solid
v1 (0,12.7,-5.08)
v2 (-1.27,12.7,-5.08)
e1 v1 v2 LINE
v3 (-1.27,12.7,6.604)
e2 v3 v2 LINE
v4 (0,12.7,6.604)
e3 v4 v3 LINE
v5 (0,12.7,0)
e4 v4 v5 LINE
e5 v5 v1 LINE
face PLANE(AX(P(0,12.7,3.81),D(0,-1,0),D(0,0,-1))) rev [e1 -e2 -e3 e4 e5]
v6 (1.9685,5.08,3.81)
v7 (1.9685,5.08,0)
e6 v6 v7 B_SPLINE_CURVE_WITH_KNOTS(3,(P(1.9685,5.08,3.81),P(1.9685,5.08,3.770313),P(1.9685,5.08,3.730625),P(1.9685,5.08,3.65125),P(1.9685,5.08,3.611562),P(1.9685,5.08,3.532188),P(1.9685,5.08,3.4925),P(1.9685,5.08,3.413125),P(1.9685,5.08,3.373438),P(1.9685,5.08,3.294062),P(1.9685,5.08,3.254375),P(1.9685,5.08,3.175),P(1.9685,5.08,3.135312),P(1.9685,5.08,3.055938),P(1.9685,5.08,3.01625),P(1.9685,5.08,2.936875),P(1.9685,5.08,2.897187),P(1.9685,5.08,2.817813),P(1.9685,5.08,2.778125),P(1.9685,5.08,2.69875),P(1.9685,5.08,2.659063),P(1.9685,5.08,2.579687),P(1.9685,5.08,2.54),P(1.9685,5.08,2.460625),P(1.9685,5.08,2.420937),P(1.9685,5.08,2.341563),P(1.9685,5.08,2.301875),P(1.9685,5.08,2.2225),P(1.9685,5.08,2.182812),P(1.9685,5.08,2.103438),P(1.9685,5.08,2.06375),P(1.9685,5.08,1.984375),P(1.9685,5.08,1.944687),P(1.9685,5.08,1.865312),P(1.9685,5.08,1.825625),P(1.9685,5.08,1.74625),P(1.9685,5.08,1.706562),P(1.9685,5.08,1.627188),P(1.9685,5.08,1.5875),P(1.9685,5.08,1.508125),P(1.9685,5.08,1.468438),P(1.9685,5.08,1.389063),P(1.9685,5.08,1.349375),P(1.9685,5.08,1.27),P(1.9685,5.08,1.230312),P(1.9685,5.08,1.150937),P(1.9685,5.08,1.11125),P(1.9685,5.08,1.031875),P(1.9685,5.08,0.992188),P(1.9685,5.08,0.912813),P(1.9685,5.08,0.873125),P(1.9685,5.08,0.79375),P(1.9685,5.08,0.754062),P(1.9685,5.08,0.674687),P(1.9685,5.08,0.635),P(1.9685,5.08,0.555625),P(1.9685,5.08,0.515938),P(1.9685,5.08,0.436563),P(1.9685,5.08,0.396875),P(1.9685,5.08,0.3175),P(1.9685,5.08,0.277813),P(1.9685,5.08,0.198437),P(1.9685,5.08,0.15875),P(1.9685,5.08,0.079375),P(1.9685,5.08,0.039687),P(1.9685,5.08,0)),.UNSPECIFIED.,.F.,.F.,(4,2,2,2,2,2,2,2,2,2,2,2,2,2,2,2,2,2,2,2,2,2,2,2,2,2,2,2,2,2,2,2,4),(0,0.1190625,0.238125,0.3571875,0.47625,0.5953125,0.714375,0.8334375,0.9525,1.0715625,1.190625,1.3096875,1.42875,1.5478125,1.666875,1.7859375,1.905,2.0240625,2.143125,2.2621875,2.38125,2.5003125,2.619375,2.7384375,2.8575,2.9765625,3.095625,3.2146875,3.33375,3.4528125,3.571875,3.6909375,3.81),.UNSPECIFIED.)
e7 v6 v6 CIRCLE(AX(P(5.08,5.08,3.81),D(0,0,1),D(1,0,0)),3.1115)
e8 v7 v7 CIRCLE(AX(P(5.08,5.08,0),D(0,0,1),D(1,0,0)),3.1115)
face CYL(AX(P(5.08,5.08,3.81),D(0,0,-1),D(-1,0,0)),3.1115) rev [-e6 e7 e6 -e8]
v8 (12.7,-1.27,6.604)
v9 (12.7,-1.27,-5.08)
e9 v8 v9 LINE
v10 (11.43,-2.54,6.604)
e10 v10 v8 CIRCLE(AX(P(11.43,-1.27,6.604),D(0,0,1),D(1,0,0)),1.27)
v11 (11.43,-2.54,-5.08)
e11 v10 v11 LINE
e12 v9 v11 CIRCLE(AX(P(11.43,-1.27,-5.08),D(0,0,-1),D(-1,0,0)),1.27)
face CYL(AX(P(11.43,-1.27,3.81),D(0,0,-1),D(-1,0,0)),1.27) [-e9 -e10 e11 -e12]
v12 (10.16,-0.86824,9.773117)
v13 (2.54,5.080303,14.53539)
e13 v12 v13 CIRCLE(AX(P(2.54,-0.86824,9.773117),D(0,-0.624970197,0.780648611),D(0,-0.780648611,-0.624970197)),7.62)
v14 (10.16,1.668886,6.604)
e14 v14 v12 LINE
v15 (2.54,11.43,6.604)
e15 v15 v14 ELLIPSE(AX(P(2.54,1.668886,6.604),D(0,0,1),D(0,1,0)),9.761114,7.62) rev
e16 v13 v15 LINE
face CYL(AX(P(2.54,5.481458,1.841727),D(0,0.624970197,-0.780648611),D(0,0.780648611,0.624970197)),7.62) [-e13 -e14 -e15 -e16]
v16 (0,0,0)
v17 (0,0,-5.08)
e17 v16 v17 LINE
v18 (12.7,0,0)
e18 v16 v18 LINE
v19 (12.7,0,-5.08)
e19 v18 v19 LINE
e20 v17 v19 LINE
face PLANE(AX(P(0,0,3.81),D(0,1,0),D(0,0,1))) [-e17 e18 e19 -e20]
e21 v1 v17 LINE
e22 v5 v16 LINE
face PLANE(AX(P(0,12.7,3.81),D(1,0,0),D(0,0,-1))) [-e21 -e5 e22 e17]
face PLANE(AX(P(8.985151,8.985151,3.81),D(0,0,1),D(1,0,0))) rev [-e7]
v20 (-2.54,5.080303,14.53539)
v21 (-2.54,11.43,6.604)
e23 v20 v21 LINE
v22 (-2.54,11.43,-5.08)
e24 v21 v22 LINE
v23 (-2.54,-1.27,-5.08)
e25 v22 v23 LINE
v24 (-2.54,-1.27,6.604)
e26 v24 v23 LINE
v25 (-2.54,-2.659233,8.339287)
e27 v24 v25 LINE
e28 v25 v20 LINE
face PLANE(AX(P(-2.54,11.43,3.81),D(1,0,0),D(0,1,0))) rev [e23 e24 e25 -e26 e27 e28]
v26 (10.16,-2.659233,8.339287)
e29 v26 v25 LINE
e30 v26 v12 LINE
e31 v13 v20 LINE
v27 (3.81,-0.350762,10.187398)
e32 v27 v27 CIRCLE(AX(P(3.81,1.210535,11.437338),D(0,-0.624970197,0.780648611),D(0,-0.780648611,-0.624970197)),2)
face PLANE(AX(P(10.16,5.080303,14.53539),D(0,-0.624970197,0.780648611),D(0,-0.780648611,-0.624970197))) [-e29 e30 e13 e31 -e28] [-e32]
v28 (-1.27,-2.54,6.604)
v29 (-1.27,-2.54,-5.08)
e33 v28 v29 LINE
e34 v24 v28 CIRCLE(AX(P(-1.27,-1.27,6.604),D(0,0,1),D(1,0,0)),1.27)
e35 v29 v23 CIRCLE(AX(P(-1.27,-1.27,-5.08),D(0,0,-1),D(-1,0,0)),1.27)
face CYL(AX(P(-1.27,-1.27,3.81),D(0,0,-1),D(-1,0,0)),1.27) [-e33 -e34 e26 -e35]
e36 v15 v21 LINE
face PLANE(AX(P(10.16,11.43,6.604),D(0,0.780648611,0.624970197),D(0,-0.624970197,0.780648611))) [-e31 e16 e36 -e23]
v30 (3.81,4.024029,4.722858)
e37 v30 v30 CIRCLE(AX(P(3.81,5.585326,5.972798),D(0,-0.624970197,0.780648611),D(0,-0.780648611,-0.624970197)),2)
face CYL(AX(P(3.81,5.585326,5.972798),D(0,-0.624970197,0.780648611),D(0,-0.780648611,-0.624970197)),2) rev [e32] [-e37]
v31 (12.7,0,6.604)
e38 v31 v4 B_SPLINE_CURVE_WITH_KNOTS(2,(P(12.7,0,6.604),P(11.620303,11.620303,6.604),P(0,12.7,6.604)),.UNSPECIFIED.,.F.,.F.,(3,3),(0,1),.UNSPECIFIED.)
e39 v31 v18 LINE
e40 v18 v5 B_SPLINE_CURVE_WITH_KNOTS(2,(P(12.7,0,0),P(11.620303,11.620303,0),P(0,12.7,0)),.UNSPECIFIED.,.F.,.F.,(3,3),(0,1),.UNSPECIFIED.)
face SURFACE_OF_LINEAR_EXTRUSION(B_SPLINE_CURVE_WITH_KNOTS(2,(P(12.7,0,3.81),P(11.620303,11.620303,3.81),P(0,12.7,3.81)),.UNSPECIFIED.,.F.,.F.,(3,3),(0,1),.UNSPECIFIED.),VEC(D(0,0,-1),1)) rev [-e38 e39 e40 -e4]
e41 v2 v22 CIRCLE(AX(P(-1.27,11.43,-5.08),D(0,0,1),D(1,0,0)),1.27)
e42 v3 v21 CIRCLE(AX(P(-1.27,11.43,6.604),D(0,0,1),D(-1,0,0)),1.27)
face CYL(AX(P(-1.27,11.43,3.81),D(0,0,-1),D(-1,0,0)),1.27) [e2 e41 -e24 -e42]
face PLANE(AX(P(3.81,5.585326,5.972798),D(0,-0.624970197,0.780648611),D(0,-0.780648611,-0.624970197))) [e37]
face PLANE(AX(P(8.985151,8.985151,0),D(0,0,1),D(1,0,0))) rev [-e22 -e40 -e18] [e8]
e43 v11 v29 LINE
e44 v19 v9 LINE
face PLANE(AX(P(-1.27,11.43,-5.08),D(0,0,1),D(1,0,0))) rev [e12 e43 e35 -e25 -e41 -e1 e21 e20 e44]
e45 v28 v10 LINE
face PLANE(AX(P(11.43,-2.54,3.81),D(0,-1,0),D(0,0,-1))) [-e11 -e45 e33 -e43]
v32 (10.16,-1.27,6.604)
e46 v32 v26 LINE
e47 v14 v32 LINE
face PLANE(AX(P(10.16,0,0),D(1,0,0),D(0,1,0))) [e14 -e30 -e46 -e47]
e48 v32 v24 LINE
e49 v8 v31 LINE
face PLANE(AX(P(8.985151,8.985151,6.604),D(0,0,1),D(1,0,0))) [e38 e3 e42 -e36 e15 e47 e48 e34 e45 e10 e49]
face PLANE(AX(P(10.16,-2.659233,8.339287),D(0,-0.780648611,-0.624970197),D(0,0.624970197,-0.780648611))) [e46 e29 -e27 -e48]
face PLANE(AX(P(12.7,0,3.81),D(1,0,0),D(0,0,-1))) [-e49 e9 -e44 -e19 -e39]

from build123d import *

# Parameters (mm, degrees)
SKETCH1_R                = 3.1115
BOSS_EXTRUDE1_DEPTH      = 3.81
BOSS_EXTRUDE2_DEPTH      = 5.08
BOSS_EXTRUDE2_DEPTH_BACK = 3.81
BOSS_EXTRUDE3_START      = 0.254
BOSS_EXTRUDE3_DEPTH      = 0.254
BOSS_EXTRUDE4_START      = 2.54
BOSS_EXTRUDE4_DEPTH      = 2.54
BOSS_EXTRUDE5_DEPTH      = 12.7
FILLET1_R                = 7.62
SKETCH11_R               = 2.000000064
CUT_EXTRUDE1_DEPTH       = 6.99999997


with BuildPart() as part:
    # Sketch1 → Boss-Extrude1 (new body)
    with BuildSketch(Plane.XY):
        with BuildLine():
            Line((0, 0), (12.7, 0))
            add(Edge.make_bspline(
                [(0, 12.7), (11.620302725, 11.620302725), (12.7, 0)],
                knots=[0, 0, 0, 1, 1, 1], degree=2))
            Line((0, 12.7), (0, 0))
        make_face()
        with Locations(Location((5.08, 5.08, 0), (0, 0, 180))):
            Circle(SKETCH1_R, mode=Mode.SUBTRACT)
    extrude(amount=BOSS_EXTRUDE1_DEPTH)

    # Sketch2 → Boss-Extrude2 (add, two sides: drawn at the far end of the back side and taken through both)
    with BuildSketch(Plane(origin=(0, 0, 0), x_dir=(-1, 0, 0), z_dir=(0, 0, -1)).offset(-BOSS_EXTRUDE2_DEPTH_BACK)):
        with BuildLine():
            Line((0, 12.7), (1.27, 12.7))
            ThreePointArc((1.27, 12.7), (2.168025612, 12.328025612), (2.54, 11.43))
            Line((2.54, 11.43), (2.54, -1.27))
            ThreePointArc((2.54, -1.27), (2.168025612, -2.168025612), (1.27, -2.54))
            Line((1.27, -2.54), (-11.43, -2.54))
            ThreePointArc((-11.43, -2.54), (-12.328025612, -2.168025612), (-12.7, -1.27))
            Line((-12.7, -1.27), (-12.7, 0))
            Line((-12.7, 0), (0, 0))
            Line((0, 0), (0, 12.7))
        make_face()
    extrude(amount=BOSS_EXTRUDE2_DEPTH + BOSS_EXTRUDE2_DEPTH_BACK)

    # Sketch3 → Boss-Extrude3 (add)
    with BuildSketch(Plane.XY.offset(3.81).offset(BOSS_EXTRUDE3_START)):
        with BuildLine():
            Line((-2.54, 11.43), (-2.54, -1.27))
            ThreePointArc((-2.54, -1.27), (-2.168025612, -2.168025612), (-1.27, -2.54))
            Line((-1.27, -2.54), (11.43, -2.54))
            ThreePointArc((11.43, -2.54), (12.328025612, -2.168025612), (12.7, -1.27))
            Line((12.7, -1.27), (12.7, 0))
            add(Edge.make_bspline(
                [(0, 12.7), (11.620302725, 11.620302725), (12.7, 0)],
                knots=[0, 0, 0, 1, 1, 1], degree=2))
            Line((0, 12.7), (-1.27, 12.7))
            ThreePointArc((-1.27, 12.7), (-2.168025612, 12.328025612), (-2.54, 11.43))
        make_face()
    extrude(amount=-BOSS_EXTRUDE3_DEPTH)

    # Sketch4 → Boss-Extrude4 (add)
    with BuildSketch(Plane.XY.offset(4.064).offset(BOSS_EXTRUDE4_START)):
        with BuildLine():
            Line((-2.54, 11.43), (-2.54, -1.27))
            ThreePointArc((-2.54, -1.27), (-2.168025612, -2.168025612), (-1.27, -2.54))
            Line((-1.27, -2.54), (11.43, -2.54))
            ThreePointArc((11.43, -2.54), (12.328025612, -2.168025612), (12.7, -1.27))
            Line((12.7, -1.27), (12.7, 0))
            add(Edge.make_bspline(
                [(0, 12.7), (11.620302725, 11.620302725), (12.7, 0)],
                knots=[0, 0, 0, 1, 1, 1], degree=2))
            Line((0, 12.7), (-1.27, 12.7))
            ThreePointArc((-1.27, 12.7), (-2.168025612, 12.328025612), (-2.54, 11.43))
        make_face()
    extrude(amount=-BOSS_EXTRUDE4_DEPTH)

    # Sketch10 → Boss-Extrude5 (add)
    with BuildSketch(Plane.ZY.offset(2.54)):
        Polygon((6.604, 11.43), (14.535389884, 5.080302802), (8.339287015, -2.659232815), (6.604, -1.27), align=None)
    extrude(amount=-BOSS_EXTRUDE5_DEPTH)

    # Fillet1
    # the kernel refuses this fillet: 7.62 mm, written as the material it takes off along each edge
    with BuildSketch(Plane(origin=(10.16, 23.335682246, -8.267356033), x_dir=(0, -0.7806486106469015, -0.6249701966454579), z_dir=(0, -0.6249701966454579, 0.7806486106469016))) as fillet1_piece_1_section:
        with BuildLine():
            CenterArc((FILLET1_R, -FILLET1_R), FILLET1_R, 90, 90)
            Line((0, -FILLET1_R), (0, 0))
            Line((0, 0), (FILLET1_R, 0))
        make_face()
    fillet1_piece_1 = extrude(amount=48.26, mode=Mode.PRIVATE)
    fillet1_piece_1 = split(fillet1_piece_1, bisect_by=Plane(origin=(9.16105253, 9.619488642, 6.604), z_dir=(0, 0, 1)), keep=Keep.TOP, mode=Mode.PRIVATE)
    add(fillet1_piece_1, mode=Mode.SUBTRACT)

    # Sketch11 → Cut-Extrude1 (cut)
    with BuildSketch(Plane(origin=(0, -5.107252745, 6.379455822), x_dir=(1, 0, 0), z_dir=(0, -0.6249701966454576, 0.7806486106469017))):
        with Locations(Location((3.81, 8.092998121, 0), (0, 0, 270))):
            Circle(SKETCH11_R)
    extrude(amount=-CUT_EXTRUDE1_DEPTH, mode=Mode.SUBTRACT)


solid = part.part
